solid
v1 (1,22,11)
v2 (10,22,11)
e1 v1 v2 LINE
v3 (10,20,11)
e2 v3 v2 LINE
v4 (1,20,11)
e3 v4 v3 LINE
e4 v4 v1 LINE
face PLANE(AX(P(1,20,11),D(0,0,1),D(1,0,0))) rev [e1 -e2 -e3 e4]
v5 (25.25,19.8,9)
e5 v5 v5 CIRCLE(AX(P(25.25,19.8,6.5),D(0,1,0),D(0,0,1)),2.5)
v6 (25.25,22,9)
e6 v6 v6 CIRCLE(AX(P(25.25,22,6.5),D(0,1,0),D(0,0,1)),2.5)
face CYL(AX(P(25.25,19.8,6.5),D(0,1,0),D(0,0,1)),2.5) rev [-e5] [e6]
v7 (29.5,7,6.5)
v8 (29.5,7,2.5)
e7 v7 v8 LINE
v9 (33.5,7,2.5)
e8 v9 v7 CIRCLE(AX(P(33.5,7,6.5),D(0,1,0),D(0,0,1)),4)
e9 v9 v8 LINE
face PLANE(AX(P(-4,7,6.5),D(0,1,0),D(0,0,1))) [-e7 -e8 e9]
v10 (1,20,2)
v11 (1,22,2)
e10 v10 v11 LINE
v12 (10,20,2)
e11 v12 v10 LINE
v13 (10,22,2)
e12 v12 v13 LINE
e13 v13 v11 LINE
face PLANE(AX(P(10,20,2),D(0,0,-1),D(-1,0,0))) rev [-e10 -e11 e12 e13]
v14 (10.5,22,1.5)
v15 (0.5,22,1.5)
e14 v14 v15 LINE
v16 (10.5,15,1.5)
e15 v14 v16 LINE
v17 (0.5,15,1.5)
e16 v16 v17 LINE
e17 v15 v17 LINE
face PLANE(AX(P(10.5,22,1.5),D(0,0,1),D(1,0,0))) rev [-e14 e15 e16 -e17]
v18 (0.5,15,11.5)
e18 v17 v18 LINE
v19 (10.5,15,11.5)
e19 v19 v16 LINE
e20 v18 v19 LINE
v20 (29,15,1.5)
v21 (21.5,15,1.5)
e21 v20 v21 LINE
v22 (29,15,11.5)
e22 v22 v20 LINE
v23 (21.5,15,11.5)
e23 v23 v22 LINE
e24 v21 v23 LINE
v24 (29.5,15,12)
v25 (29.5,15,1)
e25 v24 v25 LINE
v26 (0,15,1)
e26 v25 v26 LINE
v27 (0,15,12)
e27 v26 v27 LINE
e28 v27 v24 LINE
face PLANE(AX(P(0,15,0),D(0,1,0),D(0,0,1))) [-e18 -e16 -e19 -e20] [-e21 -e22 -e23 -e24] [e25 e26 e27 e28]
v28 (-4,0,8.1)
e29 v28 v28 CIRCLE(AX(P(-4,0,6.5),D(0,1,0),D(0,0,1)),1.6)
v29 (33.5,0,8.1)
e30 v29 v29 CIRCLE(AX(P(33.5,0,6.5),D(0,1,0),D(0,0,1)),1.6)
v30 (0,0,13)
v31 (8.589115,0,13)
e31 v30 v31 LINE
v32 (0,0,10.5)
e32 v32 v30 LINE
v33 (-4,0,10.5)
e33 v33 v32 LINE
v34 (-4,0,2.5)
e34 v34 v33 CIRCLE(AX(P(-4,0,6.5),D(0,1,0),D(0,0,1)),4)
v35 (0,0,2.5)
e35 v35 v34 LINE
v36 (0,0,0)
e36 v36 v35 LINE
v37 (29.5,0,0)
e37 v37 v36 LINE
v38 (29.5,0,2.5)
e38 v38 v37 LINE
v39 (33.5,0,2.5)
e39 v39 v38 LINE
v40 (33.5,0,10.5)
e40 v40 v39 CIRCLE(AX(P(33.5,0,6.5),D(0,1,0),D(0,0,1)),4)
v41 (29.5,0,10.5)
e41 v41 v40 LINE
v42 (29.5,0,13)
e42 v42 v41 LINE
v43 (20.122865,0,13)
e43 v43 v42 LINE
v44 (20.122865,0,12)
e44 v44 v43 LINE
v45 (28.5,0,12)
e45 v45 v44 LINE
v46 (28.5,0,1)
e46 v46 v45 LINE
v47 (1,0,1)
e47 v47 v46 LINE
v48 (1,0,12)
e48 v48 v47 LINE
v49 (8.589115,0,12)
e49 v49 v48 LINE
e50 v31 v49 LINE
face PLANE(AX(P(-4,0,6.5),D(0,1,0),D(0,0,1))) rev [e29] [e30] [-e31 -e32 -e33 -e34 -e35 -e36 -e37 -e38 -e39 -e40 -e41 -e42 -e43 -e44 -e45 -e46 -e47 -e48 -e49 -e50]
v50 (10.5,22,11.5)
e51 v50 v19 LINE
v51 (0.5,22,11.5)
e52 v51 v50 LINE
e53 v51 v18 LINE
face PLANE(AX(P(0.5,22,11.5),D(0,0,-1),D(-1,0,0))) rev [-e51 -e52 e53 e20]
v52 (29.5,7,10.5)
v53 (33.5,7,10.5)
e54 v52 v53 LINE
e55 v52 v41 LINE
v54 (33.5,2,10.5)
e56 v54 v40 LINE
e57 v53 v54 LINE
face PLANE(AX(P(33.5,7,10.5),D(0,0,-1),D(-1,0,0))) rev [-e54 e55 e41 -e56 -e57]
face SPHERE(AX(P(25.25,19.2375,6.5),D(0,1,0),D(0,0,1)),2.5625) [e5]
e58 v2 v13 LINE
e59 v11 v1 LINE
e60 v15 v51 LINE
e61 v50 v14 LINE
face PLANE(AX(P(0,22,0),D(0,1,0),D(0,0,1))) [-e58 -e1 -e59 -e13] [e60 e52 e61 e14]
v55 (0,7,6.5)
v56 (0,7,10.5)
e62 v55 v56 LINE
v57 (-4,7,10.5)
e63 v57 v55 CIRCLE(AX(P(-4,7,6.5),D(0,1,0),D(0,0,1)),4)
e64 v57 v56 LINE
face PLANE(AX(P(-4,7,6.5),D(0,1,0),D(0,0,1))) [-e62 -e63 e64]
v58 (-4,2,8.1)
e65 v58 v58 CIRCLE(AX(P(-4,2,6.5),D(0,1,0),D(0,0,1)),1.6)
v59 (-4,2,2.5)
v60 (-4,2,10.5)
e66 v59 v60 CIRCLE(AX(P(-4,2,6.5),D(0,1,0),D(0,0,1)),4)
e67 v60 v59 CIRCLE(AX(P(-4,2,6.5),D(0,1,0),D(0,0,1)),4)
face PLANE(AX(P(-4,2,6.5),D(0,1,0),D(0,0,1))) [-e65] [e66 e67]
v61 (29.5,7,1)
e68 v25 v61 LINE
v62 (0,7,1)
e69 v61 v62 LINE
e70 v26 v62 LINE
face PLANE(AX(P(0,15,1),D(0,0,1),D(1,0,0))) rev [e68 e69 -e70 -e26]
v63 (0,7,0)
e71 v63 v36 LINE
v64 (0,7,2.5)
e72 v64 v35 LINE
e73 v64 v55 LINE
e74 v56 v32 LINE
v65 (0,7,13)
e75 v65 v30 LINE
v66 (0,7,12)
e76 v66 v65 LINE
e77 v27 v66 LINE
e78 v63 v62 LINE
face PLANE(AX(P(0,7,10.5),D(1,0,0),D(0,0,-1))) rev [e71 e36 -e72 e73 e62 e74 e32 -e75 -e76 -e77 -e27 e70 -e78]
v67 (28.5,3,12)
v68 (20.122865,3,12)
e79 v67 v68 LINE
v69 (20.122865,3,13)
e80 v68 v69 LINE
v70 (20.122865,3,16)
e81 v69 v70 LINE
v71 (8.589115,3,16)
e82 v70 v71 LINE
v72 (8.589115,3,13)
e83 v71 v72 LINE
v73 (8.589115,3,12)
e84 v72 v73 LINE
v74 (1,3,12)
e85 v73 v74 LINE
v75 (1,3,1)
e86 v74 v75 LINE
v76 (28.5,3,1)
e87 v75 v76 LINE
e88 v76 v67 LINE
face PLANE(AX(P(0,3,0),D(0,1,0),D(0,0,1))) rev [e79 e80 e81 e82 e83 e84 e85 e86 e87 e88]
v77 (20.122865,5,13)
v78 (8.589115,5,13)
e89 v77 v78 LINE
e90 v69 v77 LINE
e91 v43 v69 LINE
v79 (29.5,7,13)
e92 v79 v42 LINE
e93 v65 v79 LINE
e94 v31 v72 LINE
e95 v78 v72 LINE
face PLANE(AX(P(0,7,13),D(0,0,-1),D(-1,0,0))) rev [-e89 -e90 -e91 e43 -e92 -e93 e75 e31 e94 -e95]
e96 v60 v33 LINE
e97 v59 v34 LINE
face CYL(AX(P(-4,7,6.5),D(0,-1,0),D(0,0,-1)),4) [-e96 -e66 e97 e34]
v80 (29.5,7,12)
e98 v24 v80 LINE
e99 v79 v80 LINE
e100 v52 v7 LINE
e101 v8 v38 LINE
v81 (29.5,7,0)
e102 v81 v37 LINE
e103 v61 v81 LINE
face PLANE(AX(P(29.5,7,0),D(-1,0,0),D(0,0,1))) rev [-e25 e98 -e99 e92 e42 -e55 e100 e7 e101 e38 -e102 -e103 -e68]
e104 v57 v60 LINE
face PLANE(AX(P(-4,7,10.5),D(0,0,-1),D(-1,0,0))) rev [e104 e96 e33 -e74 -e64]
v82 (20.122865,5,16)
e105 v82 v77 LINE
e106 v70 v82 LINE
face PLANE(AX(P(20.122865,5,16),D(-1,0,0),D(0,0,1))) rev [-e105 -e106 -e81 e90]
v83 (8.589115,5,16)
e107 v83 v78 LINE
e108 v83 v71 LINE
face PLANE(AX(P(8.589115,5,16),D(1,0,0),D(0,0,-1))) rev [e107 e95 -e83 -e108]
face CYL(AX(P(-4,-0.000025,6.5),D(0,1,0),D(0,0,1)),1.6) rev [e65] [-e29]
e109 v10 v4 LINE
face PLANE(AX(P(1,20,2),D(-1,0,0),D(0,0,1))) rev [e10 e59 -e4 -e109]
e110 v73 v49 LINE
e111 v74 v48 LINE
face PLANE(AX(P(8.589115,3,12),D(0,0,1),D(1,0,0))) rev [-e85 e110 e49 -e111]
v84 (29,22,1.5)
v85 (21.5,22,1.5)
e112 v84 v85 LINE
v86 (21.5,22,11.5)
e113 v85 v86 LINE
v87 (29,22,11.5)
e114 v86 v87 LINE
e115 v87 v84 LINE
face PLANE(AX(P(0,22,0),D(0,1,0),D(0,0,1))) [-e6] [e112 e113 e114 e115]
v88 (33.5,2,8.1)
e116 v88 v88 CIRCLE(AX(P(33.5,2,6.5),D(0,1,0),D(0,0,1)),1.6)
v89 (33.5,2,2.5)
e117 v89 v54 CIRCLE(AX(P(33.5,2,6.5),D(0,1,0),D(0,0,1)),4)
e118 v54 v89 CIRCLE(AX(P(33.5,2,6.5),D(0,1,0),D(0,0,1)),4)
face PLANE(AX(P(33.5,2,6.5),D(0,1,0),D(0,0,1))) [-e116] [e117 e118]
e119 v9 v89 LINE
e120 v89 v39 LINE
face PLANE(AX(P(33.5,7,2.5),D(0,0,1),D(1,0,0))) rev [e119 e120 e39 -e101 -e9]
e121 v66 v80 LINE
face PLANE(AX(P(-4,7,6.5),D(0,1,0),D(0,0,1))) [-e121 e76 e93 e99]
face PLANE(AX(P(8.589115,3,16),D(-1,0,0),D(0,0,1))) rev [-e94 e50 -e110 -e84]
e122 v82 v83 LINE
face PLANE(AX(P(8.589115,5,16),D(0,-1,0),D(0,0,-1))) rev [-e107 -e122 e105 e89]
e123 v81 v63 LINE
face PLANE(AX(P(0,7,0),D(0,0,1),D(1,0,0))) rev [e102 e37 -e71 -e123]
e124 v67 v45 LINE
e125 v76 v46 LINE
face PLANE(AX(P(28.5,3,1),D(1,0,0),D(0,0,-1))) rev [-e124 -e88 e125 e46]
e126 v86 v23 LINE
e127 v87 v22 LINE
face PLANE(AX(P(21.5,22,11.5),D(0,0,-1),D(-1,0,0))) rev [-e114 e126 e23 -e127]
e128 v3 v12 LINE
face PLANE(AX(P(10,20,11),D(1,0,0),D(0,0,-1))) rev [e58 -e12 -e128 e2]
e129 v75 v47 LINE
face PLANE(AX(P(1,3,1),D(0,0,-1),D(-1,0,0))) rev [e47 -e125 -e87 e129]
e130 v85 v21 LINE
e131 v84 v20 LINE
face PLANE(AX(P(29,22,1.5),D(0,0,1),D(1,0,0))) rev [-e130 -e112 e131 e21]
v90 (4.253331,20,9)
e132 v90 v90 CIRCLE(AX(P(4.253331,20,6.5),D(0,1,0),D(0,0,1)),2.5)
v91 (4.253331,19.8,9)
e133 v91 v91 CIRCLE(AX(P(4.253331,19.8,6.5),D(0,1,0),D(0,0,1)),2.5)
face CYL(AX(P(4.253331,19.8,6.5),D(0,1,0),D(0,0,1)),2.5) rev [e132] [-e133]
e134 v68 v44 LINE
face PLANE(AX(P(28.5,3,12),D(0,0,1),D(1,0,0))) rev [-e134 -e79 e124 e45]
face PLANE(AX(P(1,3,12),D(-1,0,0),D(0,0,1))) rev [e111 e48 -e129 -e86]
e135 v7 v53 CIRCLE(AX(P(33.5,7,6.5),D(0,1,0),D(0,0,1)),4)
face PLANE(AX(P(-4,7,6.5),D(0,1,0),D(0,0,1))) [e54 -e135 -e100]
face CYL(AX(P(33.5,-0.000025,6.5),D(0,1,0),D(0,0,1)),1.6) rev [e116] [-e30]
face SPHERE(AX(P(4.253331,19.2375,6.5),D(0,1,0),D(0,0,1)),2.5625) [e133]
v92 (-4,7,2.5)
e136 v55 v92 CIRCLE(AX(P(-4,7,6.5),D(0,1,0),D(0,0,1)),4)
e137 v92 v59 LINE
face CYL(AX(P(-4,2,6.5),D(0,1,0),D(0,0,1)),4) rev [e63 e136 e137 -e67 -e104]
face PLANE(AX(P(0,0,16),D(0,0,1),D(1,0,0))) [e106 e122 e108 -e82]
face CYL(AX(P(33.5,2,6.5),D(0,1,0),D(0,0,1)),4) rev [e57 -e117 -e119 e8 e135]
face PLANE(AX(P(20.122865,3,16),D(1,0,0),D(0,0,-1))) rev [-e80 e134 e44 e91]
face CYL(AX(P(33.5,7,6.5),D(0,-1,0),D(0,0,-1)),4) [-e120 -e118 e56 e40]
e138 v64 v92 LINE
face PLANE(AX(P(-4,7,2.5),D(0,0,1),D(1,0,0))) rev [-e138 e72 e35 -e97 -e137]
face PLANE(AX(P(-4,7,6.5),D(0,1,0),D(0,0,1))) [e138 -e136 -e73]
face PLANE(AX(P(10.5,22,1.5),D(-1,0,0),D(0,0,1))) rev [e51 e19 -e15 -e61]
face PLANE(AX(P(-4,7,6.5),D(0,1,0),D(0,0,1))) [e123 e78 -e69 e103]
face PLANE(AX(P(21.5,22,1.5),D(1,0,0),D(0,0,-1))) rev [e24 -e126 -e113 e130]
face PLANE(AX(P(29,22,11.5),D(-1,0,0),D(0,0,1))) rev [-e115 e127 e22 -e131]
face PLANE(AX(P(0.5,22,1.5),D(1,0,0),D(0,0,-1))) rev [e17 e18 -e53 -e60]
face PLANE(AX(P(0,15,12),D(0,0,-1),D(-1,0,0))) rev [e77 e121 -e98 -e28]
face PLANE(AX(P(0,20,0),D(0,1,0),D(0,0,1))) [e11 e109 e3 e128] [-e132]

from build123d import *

# Parameters (mm, degrees)
EXTRUDE_1_DEPTH     = 7
CUT_EXTRUDE_START   = -5
SKETCH_2_R          = 4
CUT_EXTRUDE_1_DEPTH = 5
SKETCH_3_W          = 29.5
SKETCH_3_H          = 11
EXTRUDE_2_DEPTH     = 8
SKETCH_4_W          = 7.5
SKETCH_4_H          = 10
SKETCH_4_W_2        = 10
EXTRUDE_3_DEPTH     = 7
SKETCH_5_W          = 9
SKETCH_5_H          = 9
CUT_EXTRUDE_2_DEPTH = 2
SKETCH_6_R          = 2.5
CUT_EXTRUDE_3_DEPTH = 2.2
SKETCH_7_R          = 1.6
CUT_EXTRUDE_4_DEPTH = 45.443784717
SKETCH_8_W          = 11.533749137
SKETCH_8_H          = 5
EXTRUDE_4_DEPTH     = 3
CUT_EXTRUDE_5_DEPTH = 3


# Read off the part's stored shape, not the designer's step: 圆顶1, 圆顶2
with BuildPart() as part:
    # 草图1 → 凸台-拉伸1 (new body)
    with BuildSketch(Plane(origin=(0, 0, 0), x_dir=(1, 0, 0), z_dir=(0, 1, 0))):
        with BuildLine():
            Line((0, 0), (29.5, 0))
            Line((29.5, 0), (29.5, -2.5))
            Line((29.5, -2.5), (33.5, -2.5))
            ThreePointArc((33.5, -2.5), (37.5, -6.5), (33.5, -10.5))
            Line((33.5, -10.5), (29.5, -10.5))
            Line((29.5, -10.5), (29.5, -13))
            Line((29.5, -13), (0, -13))
            Line((0, -13), (0, -10.5))
            Line((0, -10.5), (-4, -10.5))
            ThreePointArc((-4, -10.5), (-8, -6.5), (-4, -2.5))
            Line((-4, -2.5), (0, -2.5))
            Line((0, -2.5), (0, 0))
        make_face()
    extrude(amount=EXTRUDE_1_DEPTH)

    # 草图2 → 切除-拉伸1 (cut)
    with BuildSketch(Plane(origin=(0, 7, 0), x_dir=(1, 0, 0), z_dir=(0, 1, 0)).offset(CUT_EXTRUDE_START)):
        with Locations((-4, -6.5)):
            Circle(SKETCH_2_R)
        with Locations((33.5, -6.5)):
            Circle(SKETCH_2_R)
    extrude(amount=CUT_EXTRUDE_1_DEPTH, mode=Mode.SUBTRACT)

    # 草图3 → 凸台-拉伸2 (add)
    with BuildSketch(Plane(origin=(0, 7, 0), x_dir=(1, 0, 0), z_dir=(0, 1, 0))):
        with Locations((14.75, -6.5)):
            Rectangle(SKETCH_3_W, SKETCH_3_H)
    extrude(amount=EXTRUDE_2_DEPTH)

    # 草图4 → 凸台-拉伸3 (add)
    with BuildSketch(Plane(origin=(0, 15, 0), x_dir=(1, 0, 0), z_dir=(0, 1, 0))):
        with Locations((25.25, -6.5)):
            Rectangle(SKETCH_4_W, SKETCH_4_H)
        with Locations((5.5, -6.5)):
            Rectangle(SKETCH_4_W_2, SKETCH_4_H)
    extrude(amount=EXTRUDE_3_DEPTH)

    # 草图5 → 切除-拉伸2 (cut)
    with BuildSketch(Plane(origin=(0, 22, 0), x_dir=(1, 0, 0), z_dir=(0, 1, 0))):
        with Locations((5.5, -6.5)):
            Rectangle(SKETCH_5_W, SKETCH_5_H)
    extrude(amount=-CUT_EXTRUDE_2_DEPTH, mode=Mode.SUBTRACT)

    # 草图6 → 切除-拉伸3 (cut)
    with BuildSketch(Plane(origin=(0, 22, 0), x_dir=(1, 0, 0), z_dir=(0, 1, 0))):
        with Locations(Location((25.25, -6.5, 0), (0, 0, 270))):
            Circle(SKETCH_6_R)
        with Locations(Location((4.253331237, -6.5, 0), (0, 0, 270))):
            Circle(SKETCH_6_R)
    extrude(amount=-CUT_EXTRUDE_3_DEPTH, mode=Mode.SUBTRACT)

    # 圆顶1 outline → 圆顶1 (revolve)
    with BuildSketch(Plane(origin=(4.253331237, 0, 6.5), x_dir=(1, 0, 0), z_dir=(0, 0, 1))):
        with BuildLine():
            Line((0, 19.8), (2.500000001, 19.799999998))
            ThreePointArc((2.500000001, 19.799999998), (1.60078106, 21.238476323), (0, 21.8))
            Line((0, 21.8), (0, 19.8))
        make_face()
    revolve(axis=Axis((4.253331237, 0, 6.5), (0, 1, 0)))

    # 圆顶2 outline → 圆顶2 (revolve)
    with BuildSketch(Plane(origin=(25.25, 0, 6.5), x_dir=(1, 0, 0), z_dir=(0, 0, 1))):
        with BuildLine():
            Line((0, 19.8), (2.500000001, 19.799999997))
            ThreePointArc((2.500000001, 19.799999997), (1.60078106, 21.238476323), (0, 21.8))
            Line((0, 21.8), (0, 19.8))
        make_face()
    revolve(axis=Axis((25.25, 0, 6.5), (0, 1, 0)))

    # 草图7 → 切除-拉伸4 (cut, through all)
    with BuildSketch(Plane(origin=(0, 2, 0), x_dir=(1, 0, 0), z_dir=(0, 1, 0))):
        with Locations(Location((-4, -6.5, 0), (0, 0, 270))):
            Circle(SKETCH_7_R)
        with Locations(Location((33.5, -6.5, 0), (0, 0, 270))):
            Circle(SKETCH_7_R)
    extrude(amount=-CUT_EXTRUDE_4_DEPTH, mode=Mode.SUBTRACT)

    # 草图8 → 凸台-拉伸4 (add)
    with BuildSketch(Plane.XY.offset(13)):
        with Locations((14.355989937, 2.5)):
            Rectangle(SKETCH_8_W, SKETCH_8_H)
    extrude(amount=EXTRUDE_4_DEPTH)

    # 草图10 → 切除-拉伸5 (cut)
    with BuildSketch(Plane.XZ):
        Polygon((8.589115368, 16), (8.589115368, 12), (1, 12), (1, 1), (28.5, 1), (28.5, 12), (20.122864505, 12), (20.122864505, 16), align=None)
    extrude(amount=-CUT_EXTRUDE_5_DEPTH, mode=Mode.SUBTRACT)


solid = part.part
